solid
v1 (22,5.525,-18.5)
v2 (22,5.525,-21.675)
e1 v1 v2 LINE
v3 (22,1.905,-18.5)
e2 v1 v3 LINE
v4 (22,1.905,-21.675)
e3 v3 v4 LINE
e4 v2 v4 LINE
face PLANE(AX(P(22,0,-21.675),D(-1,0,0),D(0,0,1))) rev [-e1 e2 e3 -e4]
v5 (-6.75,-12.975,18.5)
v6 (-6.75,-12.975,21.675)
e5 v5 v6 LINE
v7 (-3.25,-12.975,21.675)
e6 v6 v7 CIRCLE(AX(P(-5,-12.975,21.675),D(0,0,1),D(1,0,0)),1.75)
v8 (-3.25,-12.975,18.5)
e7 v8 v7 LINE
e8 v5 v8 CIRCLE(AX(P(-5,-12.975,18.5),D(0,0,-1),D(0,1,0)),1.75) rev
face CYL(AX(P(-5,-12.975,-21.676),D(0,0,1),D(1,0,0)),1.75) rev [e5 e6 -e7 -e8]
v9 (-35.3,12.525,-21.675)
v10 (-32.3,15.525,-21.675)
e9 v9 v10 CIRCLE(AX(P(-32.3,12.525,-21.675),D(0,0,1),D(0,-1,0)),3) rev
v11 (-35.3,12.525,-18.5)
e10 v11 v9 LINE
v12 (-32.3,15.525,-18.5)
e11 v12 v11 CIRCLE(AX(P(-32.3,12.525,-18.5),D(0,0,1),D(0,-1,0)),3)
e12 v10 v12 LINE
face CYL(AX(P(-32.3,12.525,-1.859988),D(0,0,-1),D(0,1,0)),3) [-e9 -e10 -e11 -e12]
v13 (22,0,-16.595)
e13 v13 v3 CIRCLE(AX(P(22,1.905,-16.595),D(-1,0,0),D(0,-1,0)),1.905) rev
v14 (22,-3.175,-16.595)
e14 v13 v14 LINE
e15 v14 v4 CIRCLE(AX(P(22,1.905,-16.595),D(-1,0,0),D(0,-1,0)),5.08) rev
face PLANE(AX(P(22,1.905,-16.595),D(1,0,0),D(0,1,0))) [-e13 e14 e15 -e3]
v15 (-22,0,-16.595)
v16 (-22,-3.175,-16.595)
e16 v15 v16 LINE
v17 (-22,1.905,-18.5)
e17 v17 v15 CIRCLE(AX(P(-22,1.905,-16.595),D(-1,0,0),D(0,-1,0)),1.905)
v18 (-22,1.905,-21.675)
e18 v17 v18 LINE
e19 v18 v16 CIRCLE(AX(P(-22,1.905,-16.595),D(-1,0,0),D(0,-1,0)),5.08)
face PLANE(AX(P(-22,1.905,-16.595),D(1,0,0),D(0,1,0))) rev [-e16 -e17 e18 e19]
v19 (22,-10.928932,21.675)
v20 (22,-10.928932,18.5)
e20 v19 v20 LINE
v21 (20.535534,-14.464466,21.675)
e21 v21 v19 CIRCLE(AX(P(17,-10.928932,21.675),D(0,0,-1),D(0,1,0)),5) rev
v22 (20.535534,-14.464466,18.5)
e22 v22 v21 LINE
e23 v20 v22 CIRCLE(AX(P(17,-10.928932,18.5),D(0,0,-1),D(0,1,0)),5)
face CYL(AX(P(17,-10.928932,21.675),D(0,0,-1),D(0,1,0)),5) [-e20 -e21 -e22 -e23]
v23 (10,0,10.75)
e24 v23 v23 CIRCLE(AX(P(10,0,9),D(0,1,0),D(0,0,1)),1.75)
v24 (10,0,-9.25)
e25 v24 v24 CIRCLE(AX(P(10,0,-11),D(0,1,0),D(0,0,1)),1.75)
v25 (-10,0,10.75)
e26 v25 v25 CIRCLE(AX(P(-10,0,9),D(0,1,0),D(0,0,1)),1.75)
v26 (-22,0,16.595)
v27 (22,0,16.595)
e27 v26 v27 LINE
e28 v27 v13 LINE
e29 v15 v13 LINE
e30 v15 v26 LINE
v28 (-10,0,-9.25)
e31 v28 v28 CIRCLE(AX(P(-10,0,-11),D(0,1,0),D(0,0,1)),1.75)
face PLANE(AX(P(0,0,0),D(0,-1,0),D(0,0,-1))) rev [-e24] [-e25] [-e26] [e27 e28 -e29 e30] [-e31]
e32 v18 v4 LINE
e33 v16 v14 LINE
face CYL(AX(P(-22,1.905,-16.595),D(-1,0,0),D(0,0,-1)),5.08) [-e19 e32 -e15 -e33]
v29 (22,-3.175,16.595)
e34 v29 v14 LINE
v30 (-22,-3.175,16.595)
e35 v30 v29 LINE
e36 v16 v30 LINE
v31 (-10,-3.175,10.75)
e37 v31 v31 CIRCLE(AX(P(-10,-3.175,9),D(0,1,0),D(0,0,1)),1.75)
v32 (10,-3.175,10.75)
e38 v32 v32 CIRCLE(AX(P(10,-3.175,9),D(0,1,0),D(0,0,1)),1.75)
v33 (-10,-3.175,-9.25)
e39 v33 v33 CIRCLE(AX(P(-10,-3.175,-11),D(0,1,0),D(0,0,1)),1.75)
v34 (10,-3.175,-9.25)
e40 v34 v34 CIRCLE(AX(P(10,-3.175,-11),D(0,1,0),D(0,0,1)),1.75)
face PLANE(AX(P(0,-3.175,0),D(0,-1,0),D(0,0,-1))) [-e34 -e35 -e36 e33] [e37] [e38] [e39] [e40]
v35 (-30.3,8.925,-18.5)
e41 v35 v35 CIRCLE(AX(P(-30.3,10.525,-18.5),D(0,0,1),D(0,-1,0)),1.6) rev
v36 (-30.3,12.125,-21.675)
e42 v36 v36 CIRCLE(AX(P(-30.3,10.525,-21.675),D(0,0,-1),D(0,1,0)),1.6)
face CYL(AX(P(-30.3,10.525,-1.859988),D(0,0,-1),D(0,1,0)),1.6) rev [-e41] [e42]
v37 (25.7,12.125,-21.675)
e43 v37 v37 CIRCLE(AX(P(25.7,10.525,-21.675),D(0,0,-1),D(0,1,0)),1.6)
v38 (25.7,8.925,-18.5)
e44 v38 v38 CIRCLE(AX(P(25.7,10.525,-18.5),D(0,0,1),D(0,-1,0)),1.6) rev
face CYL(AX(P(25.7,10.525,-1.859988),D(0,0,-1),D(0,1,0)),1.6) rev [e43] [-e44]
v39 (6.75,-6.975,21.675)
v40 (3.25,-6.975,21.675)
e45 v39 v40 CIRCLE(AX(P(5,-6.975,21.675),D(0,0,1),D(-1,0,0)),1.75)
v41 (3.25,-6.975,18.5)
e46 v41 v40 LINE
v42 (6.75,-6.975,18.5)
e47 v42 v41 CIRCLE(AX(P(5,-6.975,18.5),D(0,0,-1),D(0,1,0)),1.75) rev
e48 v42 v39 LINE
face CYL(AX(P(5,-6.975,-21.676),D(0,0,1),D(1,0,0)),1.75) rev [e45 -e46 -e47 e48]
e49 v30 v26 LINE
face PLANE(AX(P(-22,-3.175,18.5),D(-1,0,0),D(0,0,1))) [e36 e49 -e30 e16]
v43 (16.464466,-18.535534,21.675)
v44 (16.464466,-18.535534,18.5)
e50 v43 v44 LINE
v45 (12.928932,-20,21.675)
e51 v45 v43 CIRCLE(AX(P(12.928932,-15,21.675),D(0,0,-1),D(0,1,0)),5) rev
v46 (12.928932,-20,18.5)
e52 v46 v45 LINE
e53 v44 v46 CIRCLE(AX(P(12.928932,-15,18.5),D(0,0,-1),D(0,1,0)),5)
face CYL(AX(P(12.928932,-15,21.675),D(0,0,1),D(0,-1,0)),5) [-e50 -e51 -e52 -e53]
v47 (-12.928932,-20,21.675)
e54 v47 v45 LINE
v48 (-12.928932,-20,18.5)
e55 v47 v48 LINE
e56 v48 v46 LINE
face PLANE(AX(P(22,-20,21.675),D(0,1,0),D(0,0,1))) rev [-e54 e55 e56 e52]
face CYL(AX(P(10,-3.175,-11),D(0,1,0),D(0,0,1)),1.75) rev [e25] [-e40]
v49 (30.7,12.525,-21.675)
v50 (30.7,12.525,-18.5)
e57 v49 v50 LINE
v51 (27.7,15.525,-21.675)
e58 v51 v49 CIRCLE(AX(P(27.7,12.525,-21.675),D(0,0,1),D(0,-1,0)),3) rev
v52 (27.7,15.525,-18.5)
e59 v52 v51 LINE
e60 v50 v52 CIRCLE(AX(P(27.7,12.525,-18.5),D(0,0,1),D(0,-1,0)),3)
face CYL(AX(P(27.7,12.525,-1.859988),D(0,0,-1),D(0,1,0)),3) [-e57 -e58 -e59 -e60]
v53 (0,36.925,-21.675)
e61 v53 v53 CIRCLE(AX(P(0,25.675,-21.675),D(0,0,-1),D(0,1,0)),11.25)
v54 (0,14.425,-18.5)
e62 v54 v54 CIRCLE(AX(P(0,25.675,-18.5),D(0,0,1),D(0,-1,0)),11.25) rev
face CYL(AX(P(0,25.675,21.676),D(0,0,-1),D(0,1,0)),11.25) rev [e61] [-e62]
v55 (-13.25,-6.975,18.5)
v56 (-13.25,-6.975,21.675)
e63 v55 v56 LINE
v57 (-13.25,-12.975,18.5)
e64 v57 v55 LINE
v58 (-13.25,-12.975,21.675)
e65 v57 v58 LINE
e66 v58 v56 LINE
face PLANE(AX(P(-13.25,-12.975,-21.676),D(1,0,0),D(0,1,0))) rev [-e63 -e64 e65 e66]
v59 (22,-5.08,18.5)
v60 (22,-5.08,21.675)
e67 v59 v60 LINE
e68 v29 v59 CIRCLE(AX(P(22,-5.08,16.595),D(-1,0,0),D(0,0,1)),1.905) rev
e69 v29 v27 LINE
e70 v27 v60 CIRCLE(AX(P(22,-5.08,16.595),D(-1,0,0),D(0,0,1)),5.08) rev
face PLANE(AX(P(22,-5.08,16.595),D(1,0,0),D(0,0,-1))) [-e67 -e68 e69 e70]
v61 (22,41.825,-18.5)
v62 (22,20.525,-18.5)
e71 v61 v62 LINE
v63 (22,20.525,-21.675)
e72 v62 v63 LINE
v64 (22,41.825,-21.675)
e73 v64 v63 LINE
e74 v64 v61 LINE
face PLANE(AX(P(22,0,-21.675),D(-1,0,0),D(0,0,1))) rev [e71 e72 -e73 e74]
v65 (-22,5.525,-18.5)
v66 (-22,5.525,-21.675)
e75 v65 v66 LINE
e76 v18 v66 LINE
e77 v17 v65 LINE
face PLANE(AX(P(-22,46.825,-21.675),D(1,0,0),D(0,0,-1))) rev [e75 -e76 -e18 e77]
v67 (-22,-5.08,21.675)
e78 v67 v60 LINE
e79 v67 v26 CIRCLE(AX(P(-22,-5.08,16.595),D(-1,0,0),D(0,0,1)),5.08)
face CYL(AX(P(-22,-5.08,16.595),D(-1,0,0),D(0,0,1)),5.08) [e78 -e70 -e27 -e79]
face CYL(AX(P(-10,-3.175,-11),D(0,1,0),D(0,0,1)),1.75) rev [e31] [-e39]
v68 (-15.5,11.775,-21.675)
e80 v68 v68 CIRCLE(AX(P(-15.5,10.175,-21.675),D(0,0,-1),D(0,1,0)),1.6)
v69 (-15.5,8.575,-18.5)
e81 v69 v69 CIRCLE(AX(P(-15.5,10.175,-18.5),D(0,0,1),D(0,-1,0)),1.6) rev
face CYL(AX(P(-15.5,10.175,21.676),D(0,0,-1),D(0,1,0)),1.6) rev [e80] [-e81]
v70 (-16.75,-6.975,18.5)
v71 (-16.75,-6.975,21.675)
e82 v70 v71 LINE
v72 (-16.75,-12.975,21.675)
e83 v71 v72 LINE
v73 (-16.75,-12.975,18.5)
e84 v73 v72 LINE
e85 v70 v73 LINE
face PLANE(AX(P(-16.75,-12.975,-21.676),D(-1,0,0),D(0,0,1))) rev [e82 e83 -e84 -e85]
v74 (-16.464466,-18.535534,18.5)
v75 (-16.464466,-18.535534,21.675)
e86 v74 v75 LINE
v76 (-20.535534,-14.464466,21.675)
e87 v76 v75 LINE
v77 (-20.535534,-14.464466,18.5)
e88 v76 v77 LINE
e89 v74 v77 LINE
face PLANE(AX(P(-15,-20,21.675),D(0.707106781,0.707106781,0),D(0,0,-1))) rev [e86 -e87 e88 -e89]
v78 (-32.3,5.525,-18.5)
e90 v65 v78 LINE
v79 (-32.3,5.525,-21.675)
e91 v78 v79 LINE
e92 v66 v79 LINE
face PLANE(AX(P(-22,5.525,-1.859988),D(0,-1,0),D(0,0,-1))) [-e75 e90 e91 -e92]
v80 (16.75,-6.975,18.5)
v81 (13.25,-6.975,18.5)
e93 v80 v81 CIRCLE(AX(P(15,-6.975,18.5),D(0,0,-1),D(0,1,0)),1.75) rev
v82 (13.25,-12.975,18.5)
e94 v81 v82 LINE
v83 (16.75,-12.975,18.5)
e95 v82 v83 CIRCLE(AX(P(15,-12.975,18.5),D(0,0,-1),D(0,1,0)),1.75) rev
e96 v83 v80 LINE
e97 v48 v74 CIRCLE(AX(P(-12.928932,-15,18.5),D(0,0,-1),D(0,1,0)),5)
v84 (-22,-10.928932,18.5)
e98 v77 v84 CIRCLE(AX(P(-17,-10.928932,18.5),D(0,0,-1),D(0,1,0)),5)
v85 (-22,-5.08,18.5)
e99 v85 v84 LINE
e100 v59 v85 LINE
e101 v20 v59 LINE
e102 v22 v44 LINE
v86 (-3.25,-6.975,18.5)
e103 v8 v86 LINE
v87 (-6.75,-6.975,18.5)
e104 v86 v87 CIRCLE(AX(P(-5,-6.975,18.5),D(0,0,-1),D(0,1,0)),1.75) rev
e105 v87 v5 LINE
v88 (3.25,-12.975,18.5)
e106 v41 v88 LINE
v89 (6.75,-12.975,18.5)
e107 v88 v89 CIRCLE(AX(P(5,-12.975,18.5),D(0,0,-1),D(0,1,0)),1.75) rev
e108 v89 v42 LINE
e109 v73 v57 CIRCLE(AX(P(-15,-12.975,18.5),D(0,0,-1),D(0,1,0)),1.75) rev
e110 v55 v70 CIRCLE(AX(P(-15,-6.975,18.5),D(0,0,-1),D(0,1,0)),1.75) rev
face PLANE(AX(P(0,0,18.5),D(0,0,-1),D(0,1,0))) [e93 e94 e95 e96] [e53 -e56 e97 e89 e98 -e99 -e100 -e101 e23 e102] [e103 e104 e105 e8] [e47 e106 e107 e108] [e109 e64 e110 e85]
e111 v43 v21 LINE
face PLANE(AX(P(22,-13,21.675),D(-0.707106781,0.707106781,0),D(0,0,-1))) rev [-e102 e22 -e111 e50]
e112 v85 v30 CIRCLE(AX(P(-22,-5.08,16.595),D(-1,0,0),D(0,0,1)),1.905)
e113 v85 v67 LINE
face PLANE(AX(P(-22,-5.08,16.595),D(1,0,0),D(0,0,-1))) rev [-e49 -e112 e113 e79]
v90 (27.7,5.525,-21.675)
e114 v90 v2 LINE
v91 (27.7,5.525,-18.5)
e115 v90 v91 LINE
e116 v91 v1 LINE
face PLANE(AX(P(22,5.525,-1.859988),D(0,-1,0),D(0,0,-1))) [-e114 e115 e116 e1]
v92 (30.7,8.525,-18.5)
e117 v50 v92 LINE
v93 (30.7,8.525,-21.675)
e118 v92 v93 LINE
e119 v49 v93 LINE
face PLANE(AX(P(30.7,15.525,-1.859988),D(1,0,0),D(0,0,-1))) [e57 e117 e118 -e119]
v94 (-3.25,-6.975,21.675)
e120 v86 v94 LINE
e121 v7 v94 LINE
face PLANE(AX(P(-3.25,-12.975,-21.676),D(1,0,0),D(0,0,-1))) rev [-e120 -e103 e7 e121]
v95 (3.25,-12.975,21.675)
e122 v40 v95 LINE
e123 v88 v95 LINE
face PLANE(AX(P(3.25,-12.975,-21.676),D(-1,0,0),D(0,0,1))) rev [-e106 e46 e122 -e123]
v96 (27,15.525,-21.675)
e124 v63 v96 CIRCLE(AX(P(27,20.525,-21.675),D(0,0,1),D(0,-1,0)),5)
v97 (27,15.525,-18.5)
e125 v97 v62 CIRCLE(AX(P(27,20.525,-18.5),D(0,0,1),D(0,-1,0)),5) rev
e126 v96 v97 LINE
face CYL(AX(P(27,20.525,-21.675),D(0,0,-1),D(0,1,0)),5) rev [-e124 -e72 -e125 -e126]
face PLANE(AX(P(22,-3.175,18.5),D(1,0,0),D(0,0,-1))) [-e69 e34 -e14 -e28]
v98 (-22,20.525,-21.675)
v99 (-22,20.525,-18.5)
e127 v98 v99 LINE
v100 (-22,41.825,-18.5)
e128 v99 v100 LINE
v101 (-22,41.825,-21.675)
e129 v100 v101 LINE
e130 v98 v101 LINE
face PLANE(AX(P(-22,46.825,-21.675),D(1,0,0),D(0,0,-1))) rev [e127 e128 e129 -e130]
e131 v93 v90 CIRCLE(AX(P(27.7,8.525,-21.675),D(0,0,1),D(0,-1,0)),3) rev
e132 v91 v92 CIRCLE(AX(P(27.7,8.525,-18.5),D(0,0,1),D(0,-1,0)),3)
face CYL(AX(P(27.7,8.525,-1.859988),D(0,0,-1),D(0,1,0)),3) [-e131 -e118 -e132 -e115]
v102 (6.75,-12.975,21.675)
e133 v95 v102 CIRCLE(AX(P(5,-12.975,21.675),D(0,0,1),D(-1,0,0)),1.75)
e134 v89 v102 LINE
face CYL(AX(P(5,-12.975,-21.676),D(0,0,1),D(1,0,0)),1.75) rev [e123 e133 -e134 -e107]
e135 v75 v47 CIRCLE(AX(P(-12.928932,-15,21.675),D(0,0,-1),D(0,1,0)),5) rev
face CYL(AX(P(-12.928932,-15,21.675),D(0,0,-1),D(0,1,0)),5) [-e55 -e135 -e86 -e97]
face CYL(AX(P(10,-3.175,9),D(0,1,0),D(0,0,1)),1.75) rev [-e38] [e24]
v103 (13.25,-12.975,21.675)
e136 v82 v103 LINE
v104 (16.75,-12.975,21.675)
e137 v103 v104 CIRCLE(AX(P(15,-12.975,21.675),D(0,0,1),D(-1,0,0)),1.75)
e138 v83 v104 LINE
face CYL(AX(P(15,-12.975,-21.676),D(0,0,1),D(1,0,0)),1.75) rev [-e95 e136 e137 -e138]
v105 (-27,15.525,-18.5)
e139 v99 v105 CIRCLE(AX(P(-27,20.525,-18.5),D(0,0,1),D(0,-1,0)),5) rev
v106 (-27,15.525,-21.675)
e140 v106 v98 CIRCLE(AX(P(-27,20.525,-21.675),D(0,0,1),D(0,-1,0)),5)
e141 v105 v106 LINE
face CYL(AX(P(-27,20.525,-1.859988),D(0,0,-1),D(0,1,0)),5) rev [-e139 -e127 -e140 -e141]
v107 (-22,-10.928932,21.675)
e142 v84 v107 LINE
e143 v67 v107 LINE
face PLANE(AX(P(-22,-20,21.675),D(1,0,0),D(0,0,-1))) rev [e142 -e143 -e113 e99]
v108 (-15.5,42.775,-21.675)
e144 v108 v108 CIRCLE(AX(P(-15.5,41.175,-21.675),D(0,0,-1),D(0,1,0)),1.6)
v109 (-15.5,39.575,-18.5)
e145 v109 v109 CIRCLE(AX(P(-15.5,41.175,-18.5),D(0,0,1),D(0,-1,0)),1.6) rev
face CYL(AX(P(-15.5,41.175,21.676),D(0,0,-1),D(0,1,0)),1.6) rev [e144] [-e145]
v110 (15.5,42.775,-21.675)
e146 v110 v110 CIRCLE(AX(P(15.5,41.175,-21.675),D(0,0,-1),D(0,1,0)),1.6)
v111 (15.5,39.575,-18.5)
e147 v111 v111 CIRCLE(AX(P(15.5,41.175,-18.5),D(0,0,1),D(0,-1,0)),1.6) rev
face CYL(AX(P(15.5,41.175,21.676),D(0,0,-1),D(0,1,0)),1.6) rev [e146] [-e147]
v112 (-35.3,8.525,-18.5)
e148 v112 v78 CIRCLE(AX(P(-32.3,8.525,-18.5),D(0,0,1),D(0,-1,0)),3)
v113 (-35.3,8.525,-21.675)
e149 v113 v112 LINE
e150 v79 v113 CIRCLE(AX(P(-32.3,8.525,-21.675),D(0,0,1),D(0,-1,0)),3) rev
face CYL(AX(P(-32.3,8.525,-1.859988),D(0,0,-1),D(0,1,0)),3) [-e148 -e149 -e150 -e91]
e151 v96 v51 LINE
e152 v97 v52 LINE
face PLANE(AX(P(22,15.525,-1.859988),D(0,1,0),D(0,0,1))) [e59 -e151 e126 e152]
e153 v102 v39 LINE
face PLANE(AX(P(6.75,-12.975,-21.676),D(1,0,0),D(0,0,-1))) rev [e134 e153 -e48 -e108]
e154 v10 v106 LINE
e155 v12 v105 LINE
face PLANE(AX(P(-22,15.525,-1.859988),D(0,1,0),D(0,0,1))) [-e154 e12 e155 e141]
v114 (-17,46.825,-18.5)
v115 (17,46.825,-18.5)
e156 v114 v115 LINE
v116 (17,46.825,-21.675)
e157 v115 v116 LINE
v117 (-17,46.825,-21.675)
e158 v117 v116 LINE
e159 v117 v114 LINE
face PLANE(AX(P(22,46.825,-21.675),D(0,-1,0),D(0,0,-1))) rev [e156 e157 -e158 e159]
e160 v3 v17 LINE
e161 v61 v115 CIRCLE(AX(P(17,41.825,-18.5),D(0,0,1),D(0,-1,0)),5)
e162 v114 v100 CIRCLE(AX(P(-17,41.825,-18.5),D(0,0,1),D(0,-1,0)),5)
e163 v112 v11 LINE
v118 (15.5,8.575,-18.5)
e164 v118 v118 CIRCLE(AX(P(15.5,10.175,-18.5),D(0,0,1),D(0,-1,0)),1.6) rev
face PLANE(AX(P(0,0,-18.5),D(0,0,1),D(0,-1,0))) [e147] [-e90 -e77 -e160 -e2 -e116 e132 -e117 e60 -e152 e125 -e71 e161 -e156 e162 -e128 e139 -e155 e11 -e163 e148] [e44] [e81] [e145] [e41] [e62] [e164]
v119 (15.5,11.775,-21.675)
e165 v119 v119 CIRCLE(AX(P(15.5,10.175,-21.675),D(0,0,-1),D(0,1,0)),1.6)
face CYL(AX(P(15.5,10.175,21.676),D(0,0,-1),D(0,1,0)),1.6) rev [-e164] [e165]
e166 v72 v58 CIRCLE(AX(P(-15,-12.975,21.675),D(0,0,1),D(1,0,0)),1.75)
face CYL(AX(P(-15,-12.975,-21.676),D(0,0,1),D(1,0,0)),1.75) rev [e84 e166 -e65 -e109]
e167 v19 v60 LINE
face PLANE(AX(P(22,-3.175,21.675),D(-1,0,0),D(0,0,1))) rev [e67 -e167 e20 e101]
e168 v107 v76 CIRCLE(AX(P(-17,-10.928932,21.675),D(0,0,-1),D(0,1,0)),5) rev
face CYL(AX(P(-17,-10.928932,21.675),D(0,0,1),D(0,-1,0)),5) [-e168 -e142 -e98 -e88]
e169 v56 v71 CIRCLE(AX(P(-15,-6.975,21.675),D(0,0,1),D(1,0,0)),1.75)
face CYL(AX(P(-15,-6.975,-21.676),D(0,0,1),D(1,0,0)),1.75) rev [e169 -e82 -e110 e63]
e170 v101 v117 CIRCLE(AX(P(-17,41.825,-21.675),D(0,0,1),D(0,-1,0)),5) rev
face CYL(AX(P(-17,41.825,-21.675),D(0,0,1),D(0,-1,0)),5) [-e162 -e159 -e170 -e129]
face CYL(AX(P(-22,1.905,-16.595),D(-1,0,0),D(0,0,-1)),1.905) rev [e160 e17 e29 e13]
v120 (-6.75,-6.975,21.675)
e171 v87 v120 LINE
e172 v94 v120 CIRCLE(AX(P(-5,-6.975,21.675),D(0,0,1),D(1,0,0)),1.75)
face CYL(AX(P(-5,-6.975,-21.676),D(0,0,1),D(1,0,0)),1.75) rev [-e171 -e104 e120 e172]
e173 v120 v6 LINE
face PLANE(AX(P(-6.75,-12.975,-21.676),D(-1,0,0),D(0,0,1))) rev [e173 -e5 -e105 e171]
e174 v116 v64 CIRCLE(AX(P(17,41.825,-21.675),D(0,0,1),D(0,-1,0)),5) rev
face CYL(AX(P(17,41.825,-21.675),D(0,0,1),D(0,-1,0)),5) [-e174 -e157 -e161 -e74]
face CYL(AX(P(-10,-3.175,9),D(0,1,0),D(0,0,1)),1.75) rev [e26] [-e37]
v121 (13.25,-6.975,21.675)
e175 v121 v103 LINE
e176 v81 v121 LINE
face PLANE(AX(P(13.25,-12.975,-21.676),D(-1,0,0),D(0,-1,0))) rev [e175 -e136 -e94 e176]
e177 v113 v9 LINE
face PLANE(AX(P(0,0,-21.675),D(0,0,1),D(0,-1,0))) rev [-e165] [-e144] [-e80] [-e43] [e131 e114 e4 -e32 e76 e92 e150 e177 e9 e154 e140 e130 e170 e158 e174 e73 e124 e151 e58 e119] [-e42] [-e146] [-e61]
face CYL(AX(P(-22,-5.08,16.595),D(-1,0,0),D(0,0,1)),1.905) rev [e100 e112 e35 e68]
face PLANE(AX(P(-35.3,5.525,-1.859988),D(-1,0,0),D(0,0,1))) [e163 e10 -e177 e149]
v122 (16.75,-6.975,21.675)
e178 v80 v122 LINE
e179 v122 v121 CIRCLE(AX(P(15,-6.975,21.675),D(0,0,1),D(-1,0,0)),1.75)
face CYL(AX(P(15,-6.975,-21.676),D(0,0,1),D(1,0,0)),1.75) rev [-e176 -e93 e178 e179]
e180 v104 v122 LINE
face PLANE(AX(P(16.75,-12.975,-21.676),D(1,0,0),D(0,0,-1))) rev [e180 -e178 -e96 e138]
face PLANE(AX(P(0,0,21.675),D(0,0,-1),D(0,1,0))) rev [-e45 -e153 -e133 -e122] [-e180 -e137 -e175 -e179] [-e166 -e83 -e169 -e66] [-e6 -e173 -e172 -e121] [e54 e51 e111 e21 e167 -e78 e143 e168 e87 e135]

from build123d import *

# Parameters (mm, degrees)
SKETCH1_W                    = 44
SKETCH1_H                    = 37
SKETCH1_R                    = 1.75
BASE_FLANGE1_DEPTH           = 3.175
EDGE_FLANGE1_STRIP_W         = 16.51
EDGE_FLANGE1_STRIP_H         = 3.175
EDGE_FLANGE1_STRIP_CUT_DEPTH = 44
EDGE_FLANGE1_DEPTH           = 44
EDGE_FLANGE2_STRIP_W         = 16.51
EDGE_FLANGE2_STRIP_H         = 3.175
EDGE_FLANGE2_STRIP_CUT_DEPTH = 44
EDGE_FLANGE2_DEPTH           = 44
CUT_EXTRUDE1_REACH           = 69.497
SKETCH12_R                   = 11.25
SKETCH12_R_2                 = 1.6
CUT_EXTRUDE2_REACH           = 69.497
CHAMFER1_SIZE                = 7
FILLET1_R                    = 5
SKETCH14_W                   = 8.7
SKETCH14_H                   = 10
SKETCH14_R                   = 1.6
SKETCH14_W_2                 = 13.3
BOSS_EXTRUDE1_DEPTH          = 3.175
FILLET2_R                    = 5
FILLET3_R                    = 3


# Sheet-metal steps are written as plain solids
with BuildPart() as part:
    # Sketch1 → Base-Flange1 (new body)
    with BuildSketch(Plane(origin=(0, 0, 0), x_dir=(1, 0, 0), z_dir=(0, 1, 0))):
        Rectangle(SKETCH1_W, SKETCH1_H)
        with Locations(Location((-10, 11, 0), (0, 0, 270))):
            Circle(SKETCH1_R, mode=Mode.SUBTRACT)
        with Locations(Location((10, 11, 0), (0, 0, 270))):
            Circle(SKETCH1_R, mode=Mode.SUBTRACT)
        with Locations(Location((10, -9, 0), (0, 0, 270))):
            Circle(SKETCH1_R, mode=Mode.SUBTRACT)
        with Locations(Location((-10, -9, 0), (0, 0, 270))):
            Circle(SKETCH1_R, mode=Mode.SUBTRACT)
    extrude(amount=-BASE_FLANGE1_DEPTH)

    # Edge-Flange1 strip (across the edge) → Edge-Flange1 strip cut (cut)
    with BuildSketch(Plane(origin=(22, 0, -18.5), x_dir=(0, 0, 1), z_dir=(-1, 0, 0))):
        with Locations((-6.35, -1.5875)):
            Rectangle(EDGE_FLANGE1_STRIP_W, EDGE_FLANGE1_STRIP_H)
    extrude(amount=EDGE_FLANGE1_STRIP_CUT_DEPTH, mode=Mode.SUBTRACT)

    # Edge-Flange1 section (across the edge) → Edge-Flange1 (add)
    with BuildSketch(Plane(origin=(22, 0, -18.5), x_dir=(0, 0, 1), z_dir=(-1, 0, 0))):
        with BuildLine():
            Line((-3.175, 1.905), (-3.175, 46.825))
            Line((-3.175, 46.825), (0, 46.825))
            Line((0, 46.825), (0, 1.905))
            ThreePointArc((0, 1.905), (0.557961582, 0.557961582), (1.905, 0))
            Line((1.905, 0), (1.905, -3.175))
            ThreePointArc((1.905, -3.175), (-1.687102448, -1.687102448), (-3.175, 1.905))
        make_face()
    extrude(amount=EDGE_FLANGE1_DEPTH)

    # Edge-Flange2 strip (across the edge) → Edge-Flange2 strip cut (cut)
    with BuildSketch(Plane(origin=(22, -3.175, 18.5), x_dir=(0, 0, -1), z_dir=(-1, 0, 0))):
        with Locations((-6.35, -1.5875)):
            Rectangle(EDGE_FLANGE2_STRIP_W, EDGE_FLANGE2_STRIP_H)
    extrude(amount=EDGE_FLANGE2_STRIP_CUT_DEPTH, mode=Mode.SUBTRACT)

    # Edge-Flange2 section (across the edge) → Edge-Flange2 (add)
    with BuildSketch(Plane(origin=(22, -3.175, 18.5), x_dir=(0, 0, -1), z_dir=(-1, 0, 0))):
        with BuildLine():
            Line((-3.175, 1.905), (-3.175, 16.825))
            Line((-3.175, 16.825), (0, 16.825))
            Line((0, 16.825), (0, 1.905))
            ThreePointArc((0, 1.905), (0.557961582, 0.557961582), (1.905, 0))
            Line((1.905, 0), (1.905, -3.175))
            ThreePointArc((1.905, -3.175), (-1.687102448, -1.687102448), (-3.175, 1.905))
        make_face()
    extrude(amount=EDGE_FLANGE2_DEPTH)

    # Sketch12 → Cut-Extrude1 (cut, up to next)
    with BuildSketch(Plane(origin=(0, 0, -21.675), x_dir=(-1, 0, 0), z_dir=(0, 0, -1)), mode=Mode.PRIVATE) as cut_extrude1_sk1:
        with Locations(Location((0, 25.675, 0), (0, 0, 90))):
            Circle(SKETCH12_R)
    cut_extrude1_tool1 = extrude(cut_extrude1_sk1.sketch, amount=-CUT_EXTRUDE1_REACH, mode=Mode.PRIVATE) & part.part
    # Sketch12 → Cut-Extrude1 (cut, up to next)
    with BuildSketch(Plane(origin=(0, 0, -21.675), x_dir=(-1, 0, 0), z_dir=(0, 0, -1)), mode=Mode.PRIVATE) as cut_extrude1_sk2:
        with Locations(Location((15.5, 41.175, 0), (0, 0, 90))):
            Circle(SKETCH12_R_2)
    cut_extrude1_tool2 = extrude(cut_extrude1_sk2.sketch, amount=-CUT_EXTRUDE1_REACH, mode=Mode.PRIVATE) & part.part
    # Sketch12 → Cut-Extrude1 (cut, up to next)
    with BuildSketch(Plane(origin=(0, 0, -21.675), x_dir=(-1, 0, 0), z_dir=(0, 0, -1)), mode=Mode.PRIVATE) as cut_extrude1_sk3:
        with Locations(Location((15.5, 10.175, 0), (0, 0, 90))):
            Circle(SKETCH12_R_2)
    cut_extrude1_tool3 = extrude(cut_extrude1_sk3.sketch, amount=-CUT_EXTRUDE1_REACH, mode=Mode.PRIVATE) & part.part
    # Sketch12 → Cut-Extrude1 (cut, up to next)
    with BuildSketch(Plane(origin=(0, 0, -21.675), x_dir=(-1, 0, 0), z_dir=(0, 0, -1)), mode=Mode.PRIVATE) as cut_extrude1_sk4:
        with Locations(Location((-15.5, 10.175, 0), (0, 0, 90))):
            Circle(SKETCH12_R_2)
    cut_extrude1_tool4 = extrude(cut_extrude1_sk4.sketch, amount=-CUT_EXTRUDE1_REACH, mode=Mode.PRIVATE) & part.part
    # Sketch12 → Cut-Extrude1 (cut, up to next)
    with BuildSketch(Plane(origin=(0, 0, -21.675), x_dir=(-1, 0, 0), z_dir=(0, 0, -1)), mode=Mode.PRIVATE) as cut_extrude1_sk5:
        with Locations(Location((-15.5, 41.175, 0), (0, 0, 90))):
            Circle(SKETCH12_R_2)
    cut_extrude1_tool5 = extrude(cut_extrude1_sk5.sketch, amount=-CUT_EXTRUDE1_REACH, mode=Mode.PRIVATE) & part.part
    add(cut_extrude1_tool1.solids().sort_by_distance((0, 25.675, -21.675))[0], mode=Mode.SUBTRACT)
    add(cut_extrude1_tool2.solids().sort_by_distance((-15.5, 41.175, -21.675))[0], mode=Mode.SUBTRACT)
    add(cut_extrude1_tool3.solids().sort_by_distance((-15.5, 10.175, -21.675))[0], mode=Mode.SUBTRACT)
    add(cut_extrude1_tool4.solids().sort_by_distance((15.5, 10.175, -21.675))[0], mode=Mode.SUBTRACT)
    add(cut_extrude1_tool5.solids().sort_by_distance((15.5, 41.175, -21.675))[0], mode=Mode.SUBTRACT)

    # Sketch13 → Cut-Extrude2 (cut, up to next)
    with BuildSketch(Plane.XY.offset(21.675), mode=Mode.PRIVATE) as cut_extrude2_sk1:
        with BuildLine():
            Line((-6.75, -12.975), (-6.75, -6.975))
            ThreePointArc((-6.75, -6.975), (-5, -5.225), (-3.25, -6.975))
            Line((-3.25, -6.975), (-3.25, -12.975))
            ThreePointArc((-3.25, -12.975), (-5, -14.725), (-6.75, -12.975))
        make_face()
    cut_extrude2_tool1 = extrude(cut_extrude2_sk1.sketch, amount=-CUT_EXTRUDE2_REACH, mode=Mode.PRIVATE) & part.part
    # Sketch13 → Cut-Extrude2 (cut, up to next)
    with BuildSketch(Plane.XY.offset(21.675), mode=Mode.PRIVATE) as cut_extrude2_sk2:
        with BuildLine():
            Line((-16.75, -12.975), (-16.75, -6.975))
            ThreePointArc((-16.75, -6.975), (-15, -5.225), (-13.25, -6.975))
            Line((-13.25, -6.975), (-13.25, -12.975))
            ThreePointArc((-13.25, -12.975), (-15, -14.725), (-16.75, -12.975))
        make_face()
    cut_extrude2_tool2 = extrude(cut_extrude2_sk2.sketch, amount=-CUT_EXTRUDE2_REACH, mode=Mode.PRIVATE) & part.part
    # Sketch13 → Cut-Extrude2 (cut, up to next)
    with BuildSketch(Plane.XY.offset(21.675), mode=Mode.PRIVATE) as cut_extrude2_sk3:
        with BuildLine():
            Line((16.75, -12.975), (16.75, -6.975))
            ThreePointArc((16.75, -6.975), (15, -5.225), (13.25, -6.975))
            Line((13.25, -6.975), (13.25, -12.975))
            ThreePointArc((13.25, -12.975), (15, -14.725), (16.75, -12.975))
        make_face()
    cut_extrude2_tool3 = extrude(cut_extrude2_sk3.sketch, amount=-CUT_EXTRUDE2_REACH, mode=Mode.PRIVATE) & part.part
    # Sketch13 → Cut-Extrude2 (cut, up to next)
    with BuildSketch(Plane.XY.offset(21.675), mode=Mode.PRIVATE) as cut_extrude2_sk4:
        with BuildLine():
            Line((6.75, -12.975), (6.75, -6.975))
            ThreePointArc((6.75, -6.975), (5, -5.225), (3.25, -6.975))
            Line((3.25, -6.975), (3.25, -12.975))
            ThreePointArc((3.25, -12.975), (5, -14.725), (6.75, -12.975))
        make_face()
    cut_extrude2_tool4 = extrude(cut_extrude2_sk4.sketch, amount=-CUT_EXTRUDE2_REACH, mode=Mode.PRIVATE) & part.part
    add(cut_extrude2_tool1.solids().sort_by_distance((-5, -9.975, 21.675))[0], mode=Mode.SUBTRACT)
    add(cut_extrude2_tool2.solids().sort_by_distance((-15, -9.975, 21.675))[0], mode=Mode.SUBTRACT)
    add(cut_extrude2_tool3.solids().sort_by_distance((15, -9.975, 21.675))[0], mode=Mode.SUBTRACT)
    add(cut_extrude2_tool4.solids().sort_by_distance((5, -9.975, 21.675))[0], mode=Mode.SUBTRACT)

    # Chamfer1
    chamfer1_edges = [part.edges().sort_by_distance(p)[0] for p in [
        (22, -20, 20.0875),
        (-22, -20, 20.0875),
    ]]
    chamfer(chamfer1_edges, length=CHAMFER1_SIZE)

    # Fillet1
    fillet1_edges = [part.edges().sort_by_distance(p)[0] for p in [
        (15, -20, 20.0875),
        (-15, -20, 20.0875),
        (-22, -13, 20.0875),
        (22, -13, 20.0875),
        (22, 46.825, -20.0875),
        (-22, 46.825, -20.0875),
    ]]
    fillet(fillet1_edges, radius=FILLET1_R)

    # Sketch14 → Boss-Extrude1 (add)
    # profile 1 of 2: a face of its own
    with BuildSketch(Plane(origin=(0, 0, -21.675), x_dir=(-1, 0, 0), z_dir=(0, 0, -1))):
        with Locations((-26.35, 10.525)):
            Rectangle(SKETCH14_W, SKETCH14_H)
        with Locations(Location((-25.7, 10.525, 0), (0, 0, 90))):
            Circle(SKETCH14_R, mode=Mode.SUBTRACT)
    # profile 2 of 2: a face of its own
    with BuildSketch(Plane(origin=(0, 0, -21.675), x_dir=(-1, 0, 0), z_dir=(0, 0, -1))):
        with Locations((28.65, 10.525)):
            Rectangle(SKETCH14_W_2, SKETCH14_H)
        with Locations(Location((30.3, 10.525, 0), (0, 0, 90))):
            Circle(SKETCH14_R, mode=Mode.SUBTRACT)
    extrude(amount=-BOSS_EXTRUDE1_DEPTH)

    # Fillet2
    fillet2_edges = [part.edges().sort_by_distance(p)[0] for p in [
        (-22, 15.525, -20.0875),
        (22, 15.525, -20.0875),
    ]]
    fillet(fillet2_edges, radius=FILLET2_R)

    # Fillet3
    fillet3_edges = [part.edges().sort_by_distance(p)[0] for p in [
        (-35.3, 15.525, -20.0875),
        (-35.3, 5.525, -20.0875),
        (30.7, 5.525, -20.0875),
        (30.7, 15.525, -20.0875),
    ]]
    fillet(fillet3_edges, radius=FILLET3_R)


solid = part.part
